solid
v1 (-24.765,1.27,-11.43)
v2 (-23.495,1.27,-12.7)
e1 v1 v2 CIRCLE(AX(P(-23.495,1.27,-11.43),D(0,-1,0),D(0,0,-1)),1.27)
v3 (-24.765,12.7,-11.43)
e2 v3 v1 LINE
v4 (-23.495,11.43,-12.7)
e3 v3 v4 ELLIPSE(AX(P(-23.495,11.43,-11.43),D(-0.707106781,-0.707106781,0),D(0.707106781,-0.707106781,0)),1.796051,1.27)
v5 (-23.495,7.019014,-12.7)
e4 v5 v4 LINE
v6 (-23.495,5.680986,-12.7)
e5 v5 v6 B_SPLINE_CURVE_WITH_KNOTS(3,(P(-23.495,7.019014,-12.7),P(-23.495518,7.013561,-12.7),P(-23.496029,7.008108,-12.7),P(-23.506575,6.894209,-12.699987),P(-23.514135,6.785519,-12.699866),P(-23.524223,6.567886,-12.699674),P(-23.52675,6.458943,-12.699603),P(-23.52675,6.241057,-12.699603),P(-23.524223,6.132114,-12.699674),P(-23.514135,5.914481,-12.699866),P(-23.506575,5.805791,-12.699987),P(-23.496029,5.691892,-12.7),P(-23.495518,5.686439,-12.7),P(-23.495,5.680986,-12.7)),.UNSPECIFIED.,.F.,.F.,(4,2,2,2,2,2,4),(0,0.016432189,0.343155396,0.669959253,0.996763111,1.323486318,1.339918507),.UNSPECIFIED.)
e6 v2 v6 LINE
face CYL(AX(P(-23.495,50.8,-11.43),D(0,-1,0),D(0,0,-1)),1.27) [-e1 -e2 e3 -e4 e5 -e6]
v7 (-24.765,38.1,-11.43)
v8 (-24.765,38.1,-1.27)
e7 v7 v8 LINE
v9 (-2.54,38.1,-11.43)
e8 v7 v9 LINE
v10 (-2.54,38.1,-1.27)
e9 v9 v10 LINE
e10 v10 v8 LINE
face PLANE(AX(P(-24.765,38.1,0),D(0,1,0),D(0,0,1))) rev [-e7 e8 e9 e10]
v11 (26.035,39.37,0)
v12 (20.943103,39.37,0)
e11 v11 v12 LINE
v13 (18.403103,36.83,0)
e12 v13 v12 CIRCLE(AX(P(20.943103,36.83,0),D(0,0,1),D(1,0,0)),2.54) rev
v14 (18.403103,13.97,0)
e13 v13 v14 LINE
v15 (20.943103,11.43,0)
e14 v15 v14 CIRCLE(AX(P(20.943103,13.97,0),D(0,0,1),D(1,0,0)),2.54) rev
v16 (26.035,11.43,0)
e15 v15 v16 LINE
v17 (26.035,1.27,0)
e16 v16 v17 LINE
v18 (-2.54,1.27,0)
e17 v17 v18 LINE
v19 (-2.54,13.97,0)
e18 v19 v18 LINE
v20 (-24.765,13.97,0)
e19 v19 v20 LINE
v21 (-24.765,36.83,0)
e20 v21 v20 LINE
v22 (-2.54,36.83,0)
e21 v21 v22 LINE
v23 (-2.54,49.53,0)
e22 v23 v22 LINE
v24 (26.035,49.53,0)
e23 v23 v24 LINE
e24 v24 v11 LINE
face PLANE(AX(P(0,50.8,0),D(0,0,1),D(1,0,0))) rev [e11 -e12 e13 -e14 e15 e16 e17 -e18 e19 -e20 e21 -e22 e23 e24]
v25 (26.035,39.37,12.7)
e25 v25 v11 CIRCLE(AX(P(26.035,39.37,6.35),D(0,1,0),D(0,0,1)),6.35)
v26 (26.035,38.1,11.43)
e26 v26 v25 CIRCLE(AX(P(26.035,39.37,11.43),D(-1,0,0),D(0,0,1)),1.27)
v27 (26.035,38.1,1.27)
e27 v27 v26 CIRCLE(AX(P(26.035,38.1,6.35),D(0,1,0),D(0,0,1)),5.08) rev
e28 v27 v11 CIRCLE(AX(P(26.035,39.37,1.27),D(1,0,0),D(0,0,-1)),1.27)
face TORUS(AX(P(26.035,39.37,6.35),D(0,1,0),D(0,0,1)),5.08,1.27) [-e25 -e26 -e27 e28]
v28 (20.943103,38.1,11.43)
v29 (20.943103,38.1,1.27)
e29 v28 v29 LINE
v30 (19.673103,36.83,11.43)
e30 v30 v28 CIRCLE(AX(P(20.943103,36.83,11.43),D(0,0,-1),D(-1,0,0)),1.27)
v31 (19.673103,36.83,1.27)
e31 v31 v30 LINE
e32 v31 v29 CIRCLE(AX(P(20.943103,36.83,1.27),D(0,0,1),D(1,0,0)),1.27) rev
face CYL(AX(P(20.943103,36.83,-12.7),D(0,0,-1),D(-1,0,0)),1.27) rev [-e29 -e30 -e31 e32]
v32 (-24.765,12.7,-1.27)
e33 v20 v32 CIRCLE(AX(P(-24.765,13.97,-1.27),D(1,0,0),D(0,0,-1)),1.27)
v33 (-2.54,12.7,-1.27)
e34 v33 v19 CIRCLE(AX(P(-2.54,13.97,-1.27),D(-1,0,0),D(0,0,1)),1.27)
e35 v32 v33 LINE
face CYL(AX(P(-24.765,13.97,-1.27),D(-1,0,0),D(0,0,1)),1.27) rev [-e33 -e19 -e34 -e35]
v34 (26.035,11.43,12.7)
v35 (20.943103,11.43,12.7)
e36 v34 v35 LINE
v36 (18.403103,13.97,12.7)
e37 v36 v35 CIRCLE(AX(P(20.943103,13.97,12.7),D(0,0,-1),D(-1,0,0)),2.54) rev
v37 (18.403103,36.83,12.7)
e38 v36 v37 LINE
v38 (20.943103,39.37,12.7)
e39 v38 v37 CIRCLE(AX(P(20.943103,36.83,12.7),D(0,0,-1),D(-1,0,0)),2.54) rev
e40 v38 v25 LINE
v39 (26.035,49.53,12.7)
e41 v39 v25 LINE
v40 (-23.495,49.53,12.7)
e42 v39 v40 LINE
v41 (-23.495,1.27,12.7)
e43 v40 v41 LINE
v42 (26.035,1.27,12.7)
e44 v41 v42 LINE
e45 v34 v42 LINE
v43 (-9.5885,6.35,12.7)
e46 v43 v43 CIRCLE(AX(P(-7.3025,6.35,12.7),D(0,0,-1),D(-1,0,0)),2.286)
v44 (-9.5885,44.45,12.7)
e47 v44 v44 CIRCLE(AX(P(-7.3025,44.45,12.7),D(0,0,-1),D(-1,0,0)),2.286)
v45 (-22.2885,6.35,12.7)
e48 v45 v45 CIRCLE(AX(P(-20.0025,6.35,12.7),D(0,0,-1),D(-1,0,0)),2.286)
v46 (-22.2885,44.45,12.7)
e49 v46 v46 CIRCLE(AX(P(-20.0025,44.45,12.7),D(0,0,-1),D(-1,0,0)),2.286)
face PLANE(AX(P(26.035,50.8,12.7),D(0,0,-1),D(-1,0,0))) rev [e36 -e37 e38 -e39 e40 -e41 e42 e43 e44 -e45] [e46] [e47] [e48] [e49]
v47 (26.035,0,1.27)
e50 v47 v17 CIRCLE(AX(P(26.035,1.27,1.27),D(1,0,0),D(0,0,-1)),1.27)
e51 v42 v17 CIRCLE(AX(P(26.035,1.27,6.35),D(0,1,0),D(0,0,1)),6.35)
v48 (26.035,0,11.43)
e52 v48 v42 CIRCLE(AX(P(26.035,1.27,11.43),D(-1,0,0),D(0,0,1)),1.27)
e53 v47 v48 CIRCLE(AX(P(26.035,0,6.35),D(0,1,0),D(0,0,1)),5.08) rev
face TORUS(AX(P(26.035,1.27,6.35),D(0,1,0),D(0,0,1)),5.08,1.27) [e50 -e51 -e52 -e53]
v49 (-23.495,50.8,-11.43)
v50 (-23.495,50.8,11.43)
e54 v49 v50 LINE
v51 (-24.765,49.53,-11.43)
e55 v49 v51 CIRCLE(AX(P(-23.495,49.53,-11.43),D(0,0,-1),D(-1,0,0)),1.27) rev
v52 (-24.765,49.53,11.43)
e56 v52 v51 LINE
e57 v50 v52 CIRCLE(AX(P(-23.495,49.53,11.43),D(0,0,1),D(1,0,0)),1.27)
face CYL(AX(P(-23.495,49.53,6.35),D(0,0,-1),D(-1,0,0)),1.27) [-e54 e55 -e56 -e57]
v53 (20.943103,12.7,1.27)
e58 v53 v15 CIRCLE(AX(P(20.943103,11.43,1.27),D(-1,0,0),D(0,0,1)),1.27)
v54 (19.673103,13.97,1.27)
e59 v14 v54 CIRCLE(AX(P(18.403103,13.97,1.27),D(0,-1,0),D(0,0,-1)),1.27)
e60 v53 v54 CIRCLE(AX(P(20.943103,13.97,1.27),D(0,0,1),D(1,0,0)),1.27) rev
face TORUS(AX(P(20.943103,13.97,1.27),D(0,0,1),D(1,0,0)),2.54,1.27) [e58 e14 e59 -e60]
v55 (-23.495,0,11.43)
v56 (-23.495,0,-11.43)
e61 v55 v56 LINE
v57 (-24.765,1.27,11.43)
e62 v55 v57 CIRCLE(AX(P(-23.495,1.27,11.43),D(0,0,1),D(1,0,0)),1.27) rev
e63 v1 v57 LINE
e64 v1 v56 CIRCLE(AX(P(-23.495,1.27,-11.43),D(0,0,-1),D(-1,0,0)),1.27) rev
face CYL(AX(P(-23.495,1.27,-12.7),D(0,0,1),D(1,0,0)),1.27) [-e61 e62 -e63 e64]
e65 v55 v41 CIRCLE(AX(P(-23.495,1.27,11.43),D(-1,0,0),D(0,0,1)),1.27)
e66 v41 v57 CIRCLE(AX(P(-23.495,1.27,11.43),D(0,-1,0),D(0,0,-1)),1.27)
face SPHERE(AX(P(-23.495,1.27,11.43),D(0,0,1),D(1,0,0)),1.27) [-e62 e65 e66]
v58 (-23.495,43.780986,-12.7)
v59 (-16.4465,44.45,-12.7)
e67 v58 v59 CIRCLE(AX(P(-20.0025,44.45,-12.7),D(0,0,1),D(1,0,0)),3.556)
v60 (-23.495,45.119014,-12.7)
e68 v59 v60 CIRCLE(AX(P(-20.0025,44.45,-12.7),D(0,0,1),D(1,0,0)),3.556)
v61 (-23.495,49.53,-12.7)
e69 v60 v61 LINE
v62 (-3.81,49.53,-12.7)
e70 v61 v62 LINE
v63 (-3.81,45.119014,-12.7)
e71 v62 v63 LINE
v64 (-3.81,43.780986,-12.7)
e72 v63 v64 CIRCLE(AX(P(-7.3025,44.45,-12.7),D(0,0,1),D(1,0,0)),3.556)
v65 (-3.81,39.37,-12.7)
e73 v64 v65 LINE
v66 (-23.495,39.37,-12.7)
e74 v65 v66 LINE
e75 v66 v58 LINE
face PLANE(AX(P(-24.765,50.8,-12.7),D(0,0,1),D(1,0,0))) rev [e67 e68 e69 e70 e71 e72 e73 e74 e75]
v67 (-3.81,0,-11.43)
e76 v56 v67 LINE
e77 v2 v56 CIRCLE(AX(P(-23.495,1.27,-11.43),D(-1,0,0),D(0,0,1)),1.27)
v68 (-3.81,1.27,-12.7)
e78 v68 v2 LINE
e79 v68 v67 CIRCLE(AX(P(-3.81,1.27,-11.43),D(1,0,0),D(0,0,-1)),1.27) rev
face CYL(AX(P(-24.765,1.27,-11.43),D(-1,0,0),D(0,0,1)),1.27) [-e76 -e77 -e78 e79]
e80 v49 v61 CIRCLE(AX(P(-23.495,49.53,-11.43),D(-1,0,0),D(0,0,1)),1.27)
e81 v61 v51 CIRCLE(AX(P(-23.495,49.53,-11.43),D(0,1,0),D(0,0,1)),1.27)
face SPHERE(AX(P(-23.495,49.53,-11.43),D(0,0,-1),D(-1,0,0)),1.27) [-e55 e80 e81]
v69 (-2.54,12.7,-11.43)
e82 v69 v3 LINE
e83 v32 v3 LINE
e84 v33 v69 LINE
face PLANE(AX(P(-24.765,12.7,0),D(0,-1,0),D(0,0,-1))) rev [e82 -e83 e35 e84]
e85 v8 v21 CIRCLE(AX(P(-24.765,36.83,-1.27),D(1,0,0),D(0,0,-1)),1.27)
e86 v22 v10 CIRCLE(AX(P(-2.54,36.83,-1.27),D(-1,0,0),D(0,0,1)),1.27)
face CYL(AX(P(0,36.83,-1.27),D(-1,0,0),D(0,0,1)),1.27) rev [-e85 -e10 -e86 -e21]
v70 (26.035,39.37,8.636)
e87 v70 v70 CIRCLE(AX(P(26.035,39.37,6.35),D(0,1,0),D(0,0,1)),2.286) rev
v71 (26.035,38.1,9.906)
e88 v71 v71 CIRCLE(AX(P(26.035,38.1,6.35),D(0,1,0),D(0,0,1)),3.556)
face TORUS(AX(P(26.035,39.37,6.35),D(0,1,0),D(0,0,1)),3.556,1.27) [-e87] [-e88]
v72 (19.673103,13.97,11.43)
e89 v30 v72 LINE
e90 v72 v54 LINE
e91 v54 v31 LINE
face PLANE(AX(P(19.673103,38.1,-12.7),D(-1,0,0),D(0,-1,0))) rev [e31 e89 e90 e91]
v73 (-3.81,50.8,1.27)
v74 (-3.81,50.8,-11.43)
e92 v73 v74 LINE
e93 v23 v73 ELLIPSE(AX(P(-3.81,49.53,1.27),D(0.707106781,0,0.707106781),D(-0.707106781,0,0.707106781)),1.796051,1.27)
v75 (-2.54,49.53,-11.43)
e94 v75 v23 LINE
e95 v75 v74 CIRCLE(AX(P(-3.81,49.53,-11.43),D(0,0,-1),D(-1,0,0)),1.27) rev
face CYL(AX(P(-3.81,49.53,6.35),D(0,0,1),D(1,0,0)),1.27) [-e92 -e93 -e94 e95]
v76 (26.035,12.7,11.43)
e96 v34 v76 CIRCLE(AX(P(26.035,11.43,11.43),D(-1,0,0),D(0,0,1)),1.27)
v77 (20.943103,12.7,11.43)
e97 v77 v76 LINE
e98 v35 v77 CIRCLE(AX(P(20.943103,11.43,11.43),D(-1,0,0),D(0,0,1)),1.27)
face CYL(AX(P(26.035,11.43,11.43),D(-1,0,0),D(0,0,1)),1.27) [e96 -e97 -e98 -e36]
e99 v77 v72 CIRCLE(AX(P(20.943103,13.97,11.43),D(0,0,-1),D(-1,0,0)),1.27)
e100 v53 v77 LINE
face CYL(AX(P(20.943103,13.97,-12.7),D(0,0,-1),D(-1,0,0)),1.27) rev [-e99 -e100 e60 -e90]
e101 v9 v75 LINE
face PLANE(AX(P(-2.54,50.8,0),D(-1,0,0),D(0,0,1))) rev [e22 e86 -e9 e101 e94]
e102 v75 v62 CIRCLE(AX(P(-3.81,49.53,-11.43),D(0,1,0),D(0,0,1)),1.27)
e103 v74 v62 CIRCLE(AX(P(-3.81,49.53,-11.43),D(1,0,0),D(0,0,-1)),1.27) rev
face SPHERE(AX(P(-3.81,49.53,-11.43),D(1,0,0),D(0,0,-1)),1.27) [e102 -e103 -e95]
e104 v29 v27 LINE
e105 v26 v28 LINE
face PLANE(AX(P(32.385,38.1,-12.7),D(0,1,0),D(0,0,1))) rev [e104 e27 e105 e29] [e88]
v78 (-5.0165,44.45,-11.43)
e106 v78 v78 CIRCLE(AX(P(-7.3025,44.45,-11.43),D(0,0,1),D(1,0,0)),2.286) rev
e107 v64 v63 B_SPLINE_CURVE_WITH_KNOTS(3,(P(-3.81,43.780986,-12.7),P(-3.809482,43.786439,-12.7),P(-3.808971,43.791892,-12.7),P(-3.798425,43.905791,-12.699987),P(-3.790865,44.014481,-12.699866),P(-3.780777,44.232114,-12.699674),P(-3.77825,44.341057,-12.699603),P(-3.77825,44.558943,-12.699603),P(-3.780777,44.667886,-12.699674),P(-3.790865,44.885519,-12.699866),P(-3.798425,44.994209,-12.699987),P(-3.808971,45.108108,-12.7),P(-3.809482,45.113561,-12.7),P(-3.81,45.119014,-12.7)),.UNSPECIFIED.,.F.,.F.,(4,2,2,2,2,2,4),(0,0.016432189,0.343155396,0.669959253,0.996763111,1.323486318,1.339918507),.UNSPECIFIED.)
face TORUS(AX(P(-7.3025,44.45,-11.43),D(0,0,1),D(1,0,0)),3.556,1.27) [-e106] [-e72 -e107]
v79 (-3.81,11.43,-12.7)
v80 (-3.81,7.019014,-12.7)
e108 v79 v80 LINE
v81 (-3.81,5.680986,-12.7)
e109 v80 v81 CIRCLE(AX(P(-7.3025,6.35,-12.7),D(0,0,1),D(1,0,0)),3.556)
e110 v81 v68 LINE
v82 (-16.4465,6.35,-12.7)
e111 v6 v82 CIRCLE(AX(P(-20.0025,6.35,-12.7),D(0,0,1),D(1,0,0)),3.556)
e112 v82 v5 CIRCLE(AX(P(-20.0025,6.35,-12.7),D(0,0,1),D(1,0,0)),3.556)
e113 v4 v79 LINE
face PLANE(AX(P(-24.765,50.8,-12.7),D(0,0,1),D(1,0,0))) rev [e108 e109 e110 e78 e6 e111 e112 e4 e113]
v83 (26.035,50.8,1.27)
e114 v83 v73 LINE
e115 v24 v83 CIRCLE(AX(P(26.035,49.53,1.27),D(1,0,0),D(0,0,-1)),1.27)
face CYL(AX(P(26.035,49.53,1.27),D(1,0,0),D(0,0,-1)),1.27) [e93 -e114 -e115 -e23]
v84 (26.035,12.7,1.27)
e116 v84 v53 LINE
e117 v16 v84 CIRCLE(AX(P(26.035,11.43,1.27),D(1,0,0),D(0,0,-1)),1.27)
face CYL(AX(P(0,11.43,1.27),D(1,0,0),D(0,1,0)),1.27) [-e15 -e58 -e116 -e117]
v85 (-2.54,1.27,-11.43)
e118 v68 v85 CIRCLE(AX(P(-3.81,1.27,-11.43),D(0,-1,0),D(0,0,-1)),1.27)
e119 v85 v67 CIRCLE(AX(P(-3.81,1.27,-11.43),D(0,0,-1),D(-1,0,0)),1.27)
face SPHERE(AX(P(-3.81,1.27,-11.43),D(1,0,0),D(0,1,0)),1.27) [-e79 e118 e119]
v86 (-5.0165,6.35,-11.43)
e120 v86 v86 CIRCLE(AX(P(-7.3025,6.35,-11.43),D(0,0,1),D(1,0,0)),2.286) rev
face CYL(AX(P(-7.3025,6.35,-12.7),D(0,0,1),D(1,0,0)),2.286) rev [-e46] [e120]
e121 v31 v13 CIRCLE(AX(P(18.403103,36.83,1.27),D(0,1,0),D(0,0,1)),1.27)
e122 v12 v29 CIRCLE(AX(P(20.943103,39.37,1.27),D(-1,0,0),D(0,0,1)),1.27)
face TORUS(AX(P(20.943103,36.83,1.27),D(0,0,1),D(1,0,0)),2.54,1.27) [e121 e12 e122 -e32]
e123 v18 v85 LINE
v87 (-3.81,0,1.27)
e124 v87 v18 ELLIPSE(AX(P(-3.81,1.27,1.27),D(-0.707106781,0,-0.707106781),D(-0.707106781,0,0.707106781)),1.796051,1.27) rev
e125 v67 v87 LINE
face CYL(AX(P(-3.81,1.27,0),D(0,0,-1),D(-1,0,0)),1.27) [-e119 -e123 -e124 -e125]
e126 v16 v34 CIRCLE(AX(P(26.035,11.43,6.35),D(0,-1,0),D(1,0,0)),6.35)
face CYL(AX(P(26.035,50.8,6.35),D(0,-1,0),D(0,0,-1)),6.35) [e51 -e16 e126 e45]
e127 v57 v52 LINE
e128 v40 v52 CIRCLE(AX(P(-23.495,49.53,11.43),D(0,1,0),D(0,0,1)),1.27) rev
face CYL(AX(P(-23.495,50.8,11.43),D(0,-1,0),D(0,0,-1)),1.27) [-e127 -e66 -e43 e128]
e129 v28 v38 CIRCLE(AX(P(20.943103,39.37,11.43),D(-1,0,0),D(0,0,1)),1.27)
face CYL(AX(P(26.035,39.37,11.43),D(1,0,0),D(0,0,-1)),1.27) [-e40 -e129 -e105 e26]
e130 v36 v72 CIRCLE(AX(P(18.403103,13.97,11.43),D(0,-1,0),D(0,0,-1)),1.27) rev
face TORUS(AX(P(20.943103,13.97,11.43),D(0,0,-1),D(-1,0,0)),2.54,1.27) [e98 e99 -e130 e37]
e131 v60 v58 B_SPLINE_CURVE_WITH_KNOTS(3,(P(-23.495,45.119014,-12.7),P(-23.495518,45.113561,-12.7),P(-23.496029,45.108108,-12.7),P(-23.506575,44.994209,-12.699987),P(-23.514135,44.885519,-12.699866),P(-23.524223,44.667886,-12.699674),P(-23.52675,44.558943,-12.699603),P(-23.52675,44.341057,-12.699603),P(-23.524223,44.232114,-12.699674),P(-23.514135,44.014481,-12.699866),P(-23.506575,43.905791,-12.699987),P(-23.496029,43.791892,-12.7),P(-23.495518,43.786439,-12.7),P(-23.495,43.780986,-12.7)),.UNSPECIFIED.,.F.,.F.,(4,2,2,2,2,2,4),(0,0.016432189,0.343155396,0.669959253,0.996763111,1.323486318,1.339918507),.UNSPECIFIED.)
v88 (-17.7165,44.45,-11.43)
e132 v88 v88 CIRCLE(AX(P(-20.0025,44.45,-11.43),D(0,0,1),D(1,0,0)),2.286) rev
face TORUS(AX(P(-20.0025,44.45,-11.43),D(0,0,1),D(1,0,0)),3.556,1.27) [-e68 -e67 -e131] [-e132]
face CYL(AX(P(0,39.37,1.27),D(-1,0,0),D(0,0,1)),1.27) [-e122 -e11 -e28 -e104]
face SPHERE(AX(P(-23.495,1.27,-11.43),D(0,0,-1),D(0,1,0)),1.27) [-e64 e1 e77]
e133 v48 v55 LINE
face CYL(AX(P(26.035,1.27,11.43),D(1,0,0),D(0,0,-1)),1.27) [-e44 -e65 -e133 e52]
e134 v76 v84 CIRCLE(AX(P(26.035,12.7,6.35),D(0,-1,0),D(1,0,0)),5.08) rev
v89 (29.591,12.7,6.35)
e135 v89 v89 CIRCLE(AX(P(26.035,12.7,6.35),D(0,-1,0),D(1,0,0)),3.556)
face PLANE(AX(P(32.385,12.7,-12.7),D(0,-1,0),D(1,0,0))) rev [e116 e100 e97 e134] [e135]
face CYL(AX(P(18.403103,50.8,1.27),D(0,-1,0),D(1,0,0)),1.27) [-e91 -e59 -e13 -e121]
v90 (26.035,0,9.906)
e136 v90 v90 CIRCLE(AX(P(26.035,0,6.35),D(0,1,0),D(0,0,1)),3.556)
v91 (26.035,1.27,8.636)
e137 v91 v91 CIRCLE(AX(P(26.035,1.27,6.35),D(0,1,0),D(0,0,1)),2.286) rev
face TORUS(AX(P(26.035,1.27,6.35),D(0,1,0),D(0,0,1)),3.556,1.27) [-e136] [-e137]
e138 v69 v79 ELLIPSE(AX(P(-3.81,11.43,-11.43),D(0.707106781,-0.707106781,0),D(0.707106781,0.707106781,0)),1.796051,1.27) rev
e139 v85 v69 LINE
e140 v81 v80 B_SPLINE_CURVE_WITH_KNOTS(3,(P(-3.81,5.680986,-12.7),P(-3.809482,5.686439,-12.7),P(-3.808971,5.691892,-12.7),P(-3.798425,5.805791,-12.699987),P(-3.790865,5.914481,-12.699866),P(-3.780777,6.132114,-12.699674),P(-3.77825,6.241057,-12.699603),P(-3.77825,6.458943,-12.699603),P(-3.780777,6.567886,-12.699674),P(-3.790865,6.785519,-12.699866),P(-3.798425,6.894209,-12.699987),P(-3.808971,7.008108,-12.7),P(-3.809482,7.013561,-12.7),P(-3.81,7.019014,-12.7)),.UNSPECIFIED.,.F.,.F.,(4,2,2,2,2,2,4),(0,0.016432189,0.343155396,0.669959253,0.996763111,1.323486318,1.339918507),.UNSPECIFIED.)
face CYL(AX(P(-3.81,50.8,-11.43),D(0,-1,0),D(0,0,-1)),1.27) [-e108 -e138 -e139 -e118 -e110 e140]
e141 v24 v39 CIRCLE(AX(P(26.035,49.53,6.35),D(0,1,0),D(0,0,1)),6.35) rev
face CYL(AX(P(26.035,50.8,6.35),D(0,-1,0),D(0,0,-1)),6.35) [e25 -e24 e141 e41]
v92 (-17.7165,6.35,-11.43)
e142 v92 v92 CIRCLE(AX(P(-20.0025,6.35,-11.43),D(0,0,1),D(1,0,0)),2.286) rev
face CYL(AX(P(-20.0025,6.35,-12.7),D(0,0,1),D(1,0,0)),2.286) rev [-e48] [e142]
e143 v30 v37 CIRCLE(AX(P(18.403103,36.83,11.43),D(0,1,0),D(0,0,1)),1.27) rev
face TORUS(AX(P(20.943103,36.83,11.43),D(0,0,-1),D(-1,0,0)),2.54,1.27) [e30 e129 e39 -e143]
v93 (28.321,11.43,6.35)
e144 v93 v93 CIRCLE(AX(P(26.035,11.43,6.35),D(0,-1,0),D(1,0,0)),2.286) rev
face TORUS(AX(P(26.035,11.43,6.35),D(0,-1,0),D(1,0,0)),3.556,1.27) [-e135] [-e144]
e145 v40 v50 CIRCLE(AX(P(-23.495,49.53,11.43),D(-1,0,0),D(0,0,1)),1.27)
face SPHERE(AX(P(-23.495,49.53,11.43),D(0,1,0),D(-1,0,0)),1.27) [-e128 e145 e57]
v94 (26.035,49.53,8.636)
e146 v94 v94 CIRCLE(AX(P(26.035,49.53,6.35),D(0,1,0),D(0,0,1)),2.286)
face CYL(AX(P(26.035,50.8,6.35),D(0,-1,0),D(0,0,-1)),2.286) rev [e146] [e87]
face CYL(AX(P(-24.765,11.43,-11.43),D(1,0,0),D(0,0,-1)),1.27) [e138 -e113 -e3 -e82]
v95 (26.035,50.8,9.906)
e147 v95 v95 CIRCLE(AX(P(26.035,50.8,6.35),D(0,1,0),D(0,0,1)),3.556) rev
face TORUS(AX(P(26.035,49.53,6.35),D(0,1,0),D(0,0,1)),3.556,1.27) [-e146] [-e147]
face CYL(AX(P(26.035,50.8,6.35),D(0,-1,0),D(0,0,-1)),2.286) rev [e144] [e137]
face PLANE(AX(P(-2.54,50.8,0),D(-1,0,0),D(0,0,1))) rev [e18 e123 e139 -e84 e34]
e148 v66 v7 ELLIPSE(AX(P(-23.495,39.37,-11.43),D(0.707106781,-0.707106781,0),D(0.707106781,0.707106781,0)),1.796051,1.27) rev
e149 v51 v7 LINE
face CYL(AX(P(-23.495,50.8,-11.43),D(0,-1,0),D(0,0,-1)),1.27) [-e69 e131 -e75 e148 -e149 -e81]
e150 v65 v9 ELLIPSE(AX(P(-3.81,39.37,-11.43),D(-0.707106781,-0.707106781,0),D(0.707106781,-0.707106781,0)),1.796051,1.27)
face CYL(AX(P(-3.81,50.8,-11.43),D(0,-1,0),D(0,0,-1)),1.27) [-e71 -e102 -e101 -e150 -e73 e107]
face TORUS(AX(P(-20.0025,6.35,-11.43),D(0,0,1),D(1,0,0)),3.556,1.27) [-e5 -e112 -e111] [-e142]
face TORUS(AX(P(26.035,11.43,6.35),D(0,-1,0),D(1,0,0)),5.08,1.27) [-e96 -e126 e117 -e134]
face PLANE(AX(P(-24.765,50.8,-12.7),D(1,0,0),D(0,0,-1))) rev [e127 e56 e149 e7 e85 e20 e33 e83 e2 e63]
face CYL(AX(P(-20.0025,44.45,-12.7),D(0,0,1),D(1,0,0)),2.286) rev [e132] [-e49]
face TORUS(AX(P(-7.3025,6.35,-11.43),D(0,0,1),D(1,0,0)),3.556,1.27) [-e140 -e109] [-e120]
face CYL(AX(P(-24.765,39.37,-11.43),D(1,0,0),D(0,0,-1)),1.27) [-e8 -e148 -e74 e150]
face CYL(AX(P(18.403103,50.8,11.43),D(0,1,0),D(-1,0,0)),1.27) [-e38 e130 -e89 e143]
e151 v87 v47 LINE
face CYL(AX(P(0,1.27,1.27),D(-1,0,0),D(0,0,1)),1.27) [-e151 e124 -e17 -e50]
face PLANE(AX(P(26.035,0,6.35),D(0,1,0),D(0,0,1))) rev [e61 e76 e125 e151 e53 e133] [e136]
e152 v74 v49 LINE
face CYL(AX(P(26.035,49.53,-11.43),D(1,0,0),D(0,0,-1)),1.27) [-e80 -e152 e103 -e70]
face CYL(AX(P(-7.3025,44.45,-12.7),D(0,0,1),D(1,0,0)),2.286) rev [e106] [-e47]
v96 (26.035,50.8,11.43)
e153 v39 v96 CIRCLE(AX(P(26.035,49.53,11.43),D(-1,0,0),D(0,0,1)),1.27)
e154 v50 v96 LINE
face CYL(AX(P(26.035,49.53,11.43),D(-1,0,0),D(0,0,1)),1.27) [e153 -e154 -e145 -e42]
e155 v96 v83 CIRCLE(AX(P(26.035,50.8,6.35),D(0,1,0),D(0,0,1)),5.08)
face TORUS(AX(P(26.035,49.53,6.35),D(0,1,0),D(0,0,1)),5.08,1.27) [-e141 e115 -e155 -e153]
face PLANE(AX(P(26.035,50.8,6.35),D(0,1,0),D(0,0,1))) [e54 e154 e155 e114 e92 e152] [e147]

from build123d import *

# Parameters (mm, degrees)
SKETCH1_R               = 2.286
BOSS_EXTRUDE1_DEPTH     = 50.8
CUT_EXTRUDE1_DEPTH      = 66.380335155
CUT_EXTRUDE1_DEPTH_BACK = 66.380335155
SKETCH2_R               = 2.286
SKETCH2_W               = 12.711897402
SKETCH2_H               = 25.4
SKETCH3_W               = 12.7
SKETCH3_H               = 25.4
CUT_EXTRUDE2_DEPTH      = 63.941922635
FILLET1_R               = 1.27


with BuildPart() as part:
    # Sketch1 → Boss-Extrude1 (new body)
    with BuildSketch(Plane(origin=(0, 0, 0), x_dir=(1, 0, 0), z_dir=(0, 1, 0))):
        with BuildLine():
            Line((0, 0), (26.035, 0))
            ThreePointArc((26.035, 0), (32.385, -6.35), (26.035, -12.7))
            Line((26.035, -12.7), (-24.765, -12.7))
            Line((-24.765, -12.7), (-24.765, 12.7))
            Line((-24.765, 12.7), (-2.54, 12.7))
            Line((-2.54, 12.7), (-2.54, 0))
            Line((-2.54, 0), (0, 0))
        make_face()
        with Locations(Location((26.035, -6.35, 0), (0, 0, 270))):
            Circle(SKETCH1_R, mode=Mode.SUBTRACT)
    extrude(amount=BOSS_EXTRUDE1_DEPTH)

    # Sketch2 → Cut-Extrude1 (cut, two sides: drawn at the far end of the back side and taken through both)
    with BuildSketch(Plane.XY.offset(12.7).offset(-CUT_EXTRUDE1_DEPTH_BACK)):
        with Locations((-20.0025, 6.35)):
            Circle(SKETCH2_R)
        with Locations((-7.3025, 6.35)):
            Circle(SKETCH2_R)
        with Locations((-7.3025, 44.45)):
            Circle(SKETCH2_R)
        with Locations((-20.0025, 44.45)):
            Circle(SKETCH2_R)
        with Locations((26.029051299, 25.4)):
            Rectangle(SKETCH2_W, SKETCH2_H)
    extrude(amount=CUT_EXTRUDE1_DEPTH + CUT_EXTRUDE1_DEPTH_BACK, mode=Mode.SUBTRACT)

    # Sketch3 → Cut-Extrude2 (cut, through all)
    with BuildSketch(Plane(origin=(-2.54, 0, 0), x_dir=(0, 0, -1), z_dir=(1, 0, 0))):
        with Locations((6.35, 25.4)):
            Rectangle(SKETCH3_W, SKETCH3_H)
    extrude(amount=-CUT_EXTRUDE2_DEPTH, mode=Mode.SUBTRACT)

    # Fillet1
    # the kernel refuses this fillet: 1.27 mm, written as the material it adds along each edge
    with BuildSketch(Plane(origin=(19.673102598, 12.7, 0), x_dir=(0, 1, 0), z_dir=(0, 0, 1)), Plane(origin=(19.673102598, 38.1, 0), x_dir=(1, 0, 0), z_dir=(0, 0, 1))) as fillet1_piece_1:
        with BuildLine():
            CenterArc((FILLET1_R, -FILLET1_R), FILLET1_R, 90, 90)
            Line((0, -FILLET1_R), (0, 0))
            Line((0, 0), (FILLET1_R, 0))
        make_face()
    extrude(amount=12.7)
    with BuildSketch(Plane(origin=(-2.54, 12.7, 0), x_dir=(0, 0, -1), z_dir=(-1, 0, 0)), Plane(origin=(-2.54, 38.1, 0), x_dir=(0, -1, 0), z_dir=(-1, 0, 0))) as fillet1_piece_2:
        with BuildLine():
            CenterArc((FILLET1_R, -FILLET1_R), FILLET1_R, 90, 90)
            Line((0, -FILLET1_R), (0, 0))
            Line((0, 0), (FILLET1_R, 0))
        make_face()
    extrude(amount=22.225)
    # the kernel refuses this fillet: 1.27 mm, written as the material it takes off along each edge
    with BuildSketch(Plane(origin=(-23.495, 49.53, -11.43), x_dir=(0, 0, -1), z_dir=(-1, 0, 0))) as fillet1_2_piece_1_section:
        Polygon((0, 0), (FILLET1_R, 0), (FILLET1_R, -FILLET1_R), (0, -FILLET1_R), align=None)
    fillet1_2_piece_1 = extrude(amount=FILLET1_R, mode=Mode.PRIVATE)
    fillet1_2_piece_1 = fillet1_2_piece_1 - Plane(origin=(-23.495, 49.53, -11.43), x_dir=(0, -0.7071067811865475, 0.7071067811865475), z_dir=(-1, 0, 0)) * Sphere(FILLET1_R, mode=Mode.PRIVATE)
    add(fillet1_2_piece_1, mode=Mode.SUBTRACT)
    with BuildSketch(Plane(origin=(-3.81, 49.53, -11.43), x_dir=(0, 0, -1), z_dir=(1, 0, 0))) as fillet1_2_piece_2_section:
        Polygon((0, 0), (FILLET1_R, 0), (FILLET1_R, FILLET1_R), (0, FILLET1_R), align=None)
    fillet1_2_piece_2 = extrude(amount=FILLET1_R, mode=Mode.PRIVATE)
    fillet1_2_piece_2 = fillet1_2_piece_2 - Plane(origin=(-3.81, 49.53, -11.43), x_dir=(0, -0.7071067811865475, 0.7071067811865475), z_dir=(1, 0, 0)) * Sphere(FILLET1_R, mode=Mode.PRIVATE)
    add(fillet1_2_piece_2, mode=Mode.SUBTRACT)
    with BuildSketch(Plane(origin=(-23.495, 1.27, 11.43), x_dir=(0, 0, 1), z_dir=(-1, 0, 0))) as fillet1_2_piece_3_section:
        Polygon((0, 0), (FILLET1_R, 0), (FILLET1_R, -FILLET1_R), (0, -FILLET1_R), align=None)
    fillet1_2_piece_3 = extrude(amount=FILLET1_R, mode=Mode.PRIVATE)
    fillet1_2_piece_3 = fillet1_2_piece_3 - Plane(origin=(-23.495, 1.27, 11.43), x_dir=(0, 0.7071067811865475, -0.7071067811865475), z_dir=(-1, 0, 0)) * Sphere(FILLET1_R, mode=Mode.PRIVATE)
    add(fillet1_2_piece_3, mode=Mode.SUBTRACT)
    with BuildSketch(Plane(origin=(-23.495, 49.53, 11.43), x_dir=(0, 0, 1), z_dir=(-1, 0, 0))) as fillet1_2_piece_4_section:
        Polygon((0, 0), (FILLET1_R, 0), (FILLET1_R, FILLET1_R), (0, FILLET1_R), align=None)
    fillet1_2_piece_4 = extrude(amount=FILLET1_R, mode=Mode.PRIVATE)
    fillet1_2_piece_4 = fillet1_2_piece_4 - Plane(origin=(-23.495, 49.53, 11.43), x_dir=(0, -0.7071067811865475, -0.7071067811865475), z_dir=(-1, 0, 0)) * Sphere(FILLET1_R, mode=Mode.PRIVATE)
    add(fillet1_2_piece_4, mode=Mode.SUBTRACT)
    with BuildSketch(Plane(origin=(-23.495, 1.27, -11.43), x_dir=(0, 0, -1), z_dir=(-1, 0, 0))) as fillet1_2_piece_5_section:
        Polygon((0, 0), (FILLET1_R, 0), (FILLET1_R, FILLET1_R), (0, FILLET1_R), align=None)
    fillet1_2_piece_5 = extrude(amount=FILLET1_R, mode=Mode.PRIVATE)
    fillet1_2_piece_5 = fillet1_2_piece_5 - Plane(origin=(-23.495, 1.27, -11.43), x_dir=(0, 0.7071067811865475, 0.7071067811865475), z_dir=(-1, 0, 0)) * Sphere(FILLET1_R, mode=Mode.PRIVATE)
    add(fillet1_2_piece_5, mode=Mode.SUBTRACT)
    with BuildSketch(Plane(origin=(-3.81, 1.27, -11.43), x_dir=(1, 0, 0), z_dir=(0, 0, -1))) as fillet1_2_piece_6_section:
        Polygon((0, 0), (FILLET1_R, 0), (FILLET1_R, FILLET1_R), (0, FILLET1_R), align=None)
    fillet1_2_piece_6 = extrude(amount=FILLET1_R, mode=Mode.PRIVATE)
    fillet1_2_piece_6 = fillet1_2_piece_6 - Plane(origin=(-3.81, 1.27, -11.43), x_dir=(-0.7071067811865475, 0.7071067811865475, 0), z_dir=(0, 0, -1)) * Sphere(FILLET1_R, mode=Mode.PRIVATE)
    add(fillet1_2_piece_6, mode=Mode.SUBTRACT)
    with BuildSketch(Plane(origin=(-23.495, 50.8, -12.7), x_dir=(0, -1, 0), z_dir=(1, 0, 0))) as fillet1_2_piece_7:
        with BuildLine():
            CenterArc((FILLET1_R, -FILLET1_R), FILLET1_R, 90, 90)
            Line((0, -FILLET1_R), (0, 0))
            Line((0, 0), (FILLET1_R, 0))
        make_face()
    extrude(amount=19.685, mode=Mode.SUBTRACT)
    with BuildSketch(Plane(origin=(-24.765, 1.27, 12.7), x_dir=(0, 0, -1), z_dir=(0, 1, 0))) as fillet1_2_piece_8:
        with BuildLine():
            CenterArc((FILLET1_R, -FILLET1_R), FILLET1_R, 90, 90)
            Line((0, -FILLET1_R), (0, 0))
            Line((0, 0), (FILLET1_R, 0))
        make_face()
    extrude(amount=48.26, mode=Mode.SUBTRACT)
    with BuildSketch(Plane(origin=(-24.765, 34.925, -12.7), x_dir=(0, 0, 1), z_dir=(0, 1, 0)), Plane(origin=(-24.765, 1.27, -12.7), x_dir=(0, 0, 1), z_dir=(0, 1, 0)), Plane(origin=(-2.54, 1.27, -12.7), x_dir=(-1, 0, 0), z_dir=(0, 1, 0))) as fillet1_2_piece_9:
        with BuildLine():
            CenterArc((FILLET1_R, FILLET1_R), FILLET1_R, 180, 90)
            Line((0, FILLET1_R), (0, 0))
            Line((0, 0), (FILLET1_R, 0))
        make_face()
    extrude(amount=14.605, mode=Mode.SUBTRACT)
    with BuildSketch(Plane(origin=(-2.54, 34.925, -12.7), x_dir=(0, 0, 1), z_dir=(0, 1, 0))) as fillet1_2_piece_10:
        with BuildLine():
            CenterArc((FILLET1_R, -FILLET1_R), FILLET1_R, 90, 90)
            Line((0, -FILLET1_R), (0, 0))
            Line((0, 0), (FILLET1_R, 0))
        make_face()
    extrude(amount=14.605, mode=Mode.SUBTRACT)
    with BuildSketch(Plane(origin=(-24.765, 50.8, 11.43), x_dir=(0, -1, 0), z_dir=(0, 0, -1))) as fillet1_2_piece_11:
        with BuildLine():
            CenterArc((FILLET1_R, -FILLET1_R), FILLET1_R, 90, 90)
            Line((0, -FILLET1_R), (0, 0))
            Line((0, 0), (FILLET1_R, 0))
        make_face()
    extrude(amount=22.86, mode=Mode.SUBTRACT)
    with BuildSketch(Plane(origin=(26.035, 0, 6.35), x_dir=(0, 0, 1), z_dir=(-1, 0, 0))) as fillet1_2_piece_12:
        with BuildLine():
            CenterArc((2.286 + FILLET1_R, FILLET1_R), FILLET1_R, 180, 90)
            Line((2.286 + FILLET1_R, 0), (2.286, 0))
            Line((2.286, 0), (2.286, FILLET1_R))
        make_face()
    revolve(axis=Axis((26.035, 0, 6.35), (0, 1, 0)), mode=Mode.SUBTRACT)
    with BuildSketch(Plane(origin=(26.035, 50.8, 6.35), x_dir=(0, 0, 1), z_dir=(-1, 0, 0))) as fillet1_2_piece_13:
        with BuildLine():
            CenterArc((2.286 + FILLET1_R, -FILLET1_R), FILLET1_R, 90, 90)
            Line((2.286 + FILLET1_R, 0), (2.286, 0))
            Line((2.286, 0), (2.286, -FILLET1_R))
        make_face()
    revolve(axis=Axis((26.035, 50.8, 6.35), (0, 1, 0)), mode=Mode.SUBTRACT)
    with BuildSketch(Plane(origin=(26.035, 50.8, 12.7), x_dir=(0, 0, -1), z_dir=(-1, 0, 0)), Plane(origin=(26.035, 0, 12.7), x_dir=(0, 1, 0), z_dir=(-1, 0, 0))) as fillet1_2_piece_14:
        with BuildLine():
            CenterArc((FILLET1_R, FILLET1_R), FILLET1_R, 180, 90)
            Line((0, FILLET1_R), (0, 0))
            Line((0, 0), (FILLET1_R, 0))
        make_face()
    extrude(amount=49.53, mode=Mode.SUBTRACT)
    with BuildSketch(Plane(origin=(26.035, 50.8, 6.35), x_dir=(0, 0, -1), z_dir=(-1, 0, 0))) as fillet1_2_piece_15:
        with BuildLine():
            CenterArc((6.35 - FILLET1_R, FILLET1_R), FILLET1_R, 270, 90)
            Line((6.35 - FILLET1_R, 0), (6.35, 0))
            Line((6.35, 0), (6.35, FILLET1_R))
        make_face()
    revolve(axis=Axis((26.035, 50.8, 6.35), (0, -1, 0)), revolution_arc=180, mode=Mode.SUBTRACT)
    with BuildSketch(Plane(origin=(-20.0025, 44.45, -12.7), x_dir=(1, 0, 0), z_dir=(0, -1, 0))) as fillet1_2_piece_16:
        with BuildLine():
            CenterArc((2.286 + FILLET1_R, FILLET1_R), FILLET1_R, 180, 90)
            Line((2.286, FILLET1_R), (2.286, 0))
            Line((2.286, 0), (2.286 + FILLET1_R, 0))
        make_face()
    revolve(axis=Axis((-20.0025, 44.45, -12.7), (0, 0, 1)), mode=Mode.SUBTRACT)
    with BuildSketch(Plane(origin=(-7.3025, 44.45, -12.7), x_dir=(1, 0, 0), z_dir=(0, -1, 0))) as fillet1_2_piece_17:
        with BuildLine():
            CenterArc((2.286 + FILLET1_R, FILLET1_R), FILLET1_R, 180, 90)
            Line((2.286, FILLET1_R), (2.286, 0))
            Line((2.286, 0), (2.286 + FILLET1_R, 0))
        make_face()
    revolve(axis=Axis((-7.3025, 44.45, -12.7), (0, 0, 1)), mode=Mode.SUBTRACT)
    with BuildSketch(Plane(origin=(-7.3025, 6.35, -12.7), x_dir=(1, 0, 0), z_dir=(0, -1, 0))) as fillet1_2_piece_18:
        with BuildLine():
            CenterArc((2.286 + FILLET1_R, FILLET1_R), FILLET1_R, 180, 90)
            Line((2.286, FILLET1_R), (2.286, 0))
            Line((2.286, 0), (2.286 + FILLET1_R, 0))
        make_face()
    revolve(axis=Axis((-7.3025, 6.35, -12.7), (0, 0, 1)), mode=Mode.SUBTRACT)
    with BuildSketch(Plane(origin=(26.035, 12.7, 6.35), x_dir=(0, 0, 1), z_dir=(1, 0, 0))) as fillet1_2_piece_19:
        with BuildLine():
            CenterArc((2.286 + FILLET1_R, FILLET1_R), FILLET1_R, 180, 90)
            Line((2.286, FILLET1_R), (2.286, 0))
            Line((2.286, 0), (2.286 + FILLET1_R, 0))
        make_face()
    revolve(axis=Axis((26.035, 12.7, 6.35), (0, -1, 0)), mode=Mode.SUBTRACT)
    with BuildSketch(Plane(origin=(26.035, 38.1, 6.35), x_dir=(0, 0, 1), z_dir=(1, 0, 0))) as fillet1_2_piece_20:
        with BuildLine():
            CenterArc((2.286 + FILLET1_R, -FILLET1_R), FILLET1_R, 90, 90)
            Line((2.286, -FILLET1_R), (2.286, 0))
            Line((2.286, 0), (2.286 + FILLET1_R, 0))
        make_face()
    revolve(axis=Axis((26.035, 38.1, 6.35), (0, -1, 0)), mode=Mode.SUBTRACT)
    with BuildSketch(Plane(origin=(-2.54, 50.8, 0), x_dir=(0, -1, 0), z_dir=(1, 0, 0)), Plane(origin=(26.035, 0, 0), x_dir=(0, 1, 0), z_dir=(-1, 0, 0))) as fillet1_2_piece_21:
        with BuildLine():
            CenterArc((FILLET1_R, -FILLET1_R), FILLET1_R, 90, 90)
            Line((0, -FILLET1_R), (0, 0))
            Line((0, 0), (FILLET1_R, 0))
        make_face()
    extrude(amount=28.575, mode=Mode.SUBTRACT)
    with BuildSketch(Plane(origin=(-20.0025, 6.35, -12.7), x_dir=(1, 0, 0), z_dir=(0, -1, 0))) as fillet1_2_piece_22:
        with BuildLine():
            CenterArc((2.286 + FILLET1_R, FILLET1_R), FILLET1_R, 180, 90)
            Line((2.286, FILLET1_R), (2.286, 0))
            Line((2.286, 0), (2.286 + FILLET1_R, 0))
        make_face()
    revolve(axis=Axis((-20.0025, 6.35, -12.7), (0, 0, 1)), mode=Mode.SUBTRACT)
    with BuildSketch(Plane(origin=(0.635, 38.1, -12.7), x_dir=(0, 0, 1), z_dir=(-1, 0, 0)), Plane(origin=(0.635, 12.7, -12.7), x_dir=(0, -1, 0), z_dir=(-1, 0, 0))) as fillet1_2_piece_23:
        with BuildLine():
            CenterArc((FILLET1_R, FILLET1_R), FILLET1_R, 180, 90)
            Line((0, FILLET1_R), (0, 0))
            Line((0, 0), (FILLET1_R, 0))
        make_face()
    extrude(amount=28.575, mode=Mode.SUBTRACT)
    with BuildSketch(Plane(origin=(26.035, 0, 6.35), x_dir=(0, 0, -1), z_dir=(-1, 0, 0))) as fillet1_2_piece_24:
        with BuildLine():
            CenterArc((6.35 - FILLET1_R, -FILLET1_R), FILLET1_R, 0, 90)
            Line((6.35 - FILLET1_R, 0), (6.35, 0))
            Line((6.35, 0), (6.35, -FILLET1_R))
        make_face()
    revolve(axis=Axis((26.035, 0, 6.35), (0, -1, 0)), revolution_arc=180, mode=Mode.SUBTRACT)
    with BuildSketch(Plane(origin=(-24.765, 0, 11.43), x_dir=(0, 1, 0), z_dir=(0, 0, -1))) as fillet1_2_piece_25:
        with BuildLine():
            CenterArc((FILLET1_R, FILLET1_R), FILLET1_R, 180, 90)
            Line((0, FILLET1_R), (0, 0))
            Line((0, 0), (FILLET1_R, 0))
        make_face()
    extrude(amount=22.86, mode=Mode.SUBTRACT)
    with BuildSketch(Plane(origin=(-2.54, 50.8, -11.43), x_dir=(0, -1, 0), z_dir=(0, 0, 1))) as fillet1_2_piece_26:
        with BuildLine():
            CenterArc((FILLET1_R, -FILLET1_R), FILLET1_R, 90, 90)
            Line((0, -FILLET1_R), (0, 0))
            Line((0, 0), (FILLET1_R, 0))
        make_face()
    extrude(amount=11.43, mode=Mode.SUBTRACT)
    with BuildSketch(Plane(origin=(-23.495, 0, -12.7), x_dir=(0, 1, 0), z_dir=(1, 0, 0))) as fillet1_2_piece_27:
        with BuildLine():
            CenterArc((FILLET1_R, FILLET1_R), FILLET1_R, 180, 90)
            Line((0, FILLET1_R), (0, 0))
            Line((0, 0), (FILLET1_R, 0))
        make_face()
    extrude(amount=19.685, mode=Mode.SUBTRACT)
    with BuildSketch(Plane(origin=(-2.54, 0, -11.43), x_dir=(0, 1, 0), z_dir=(0, 0, 1))) as fillet1_2_piece_28:
        with BuildLine():
            CenterArc((FILLET1_R, FILLET1_R), FILLET1_R, 180, 90)
            Line((0, FILLET1_R), (0, 0))
            Line((0, 0), (FILLET1_R, 0))
        make_face()
    extrude(amount=11.43, mode=Mode.SUBTRACT)
    with BuildSketch(Plane(origin=(-5.715, 50.8, 0), x_dir=(0, -1, 0), z_dir=(1, 0, 0))) as fillet1_2_piece_29a_section:
        with BuildLine():
            CenterArc((FILLET1_R, -FILLET1_R), FILLET1_R, 90, 90)
            Line((0, -FILLET1_R), (0, 0))
            Line((0, 0), (FILLET1_R, 0))
        make_face()
    fillet1_2_piece_29a = extrude(amount=31.75, mode=Mode.PRIVATE)
    fillet1_2_piece_29a = split(fillet1_2_piece_29a, bisect_by=Plane(origin=(-2.54, 50.512478205, 0.287521795), z_dir=(-1, 0, 0)), keep=Keep.TOP, mode=Mode.PRIVATE)
    with BuildSketch(Plane(origin=(-2.54, 50.8, -11.43), x_dir=(0, -1, 0), z_dir=(0, 0, 1))) as fillet1_2_piece_29b_section:
        with BuildLine():
            CenterArc((FILLET1_R, -FILLET1_R), FILLET1_R, 90, 90)
            Line((0, -FILLET1_R), (0, 0))
            Line((0, 0), (FILLET1_R, 0))
        make_face()
    fillet1_2_piece_29b = extrude(amount=14.605, mode=Mode.PRIVATE)
    fillet1_2_piece_29b = split(fillet1_2_piece_29b, bisect_by=Plane(origin=(-2.827521795, 50.512478205, 0), z_dir=(0, 0, 1)), keep=Keep.TOP, mode=Mode.PRIVATE)
    fillet1_2_piece_29 = fillet1_2_piece_29a & fillet1_2_piece_29b
    add(fillet1_2_piece_29, mode=Mode.SUBTRACT)
    with BuildSketch(Plane(origin=(-2.54, 0, -11.43), x_dir=(0, 1, 0), z_dir=(0, 0, 1))) as fillet1_2_piece_30a_section:
        with BuildLine():
            CenterArc((FILLET1_R, FILLET1_R), FILLET1_R, 180, 90)
            Line((0, FILLET1_R), (0, 0))
            Line((0, 0), (FILLET1_R, 0))
        make_face()
    fillet1_2_piece_30a = extrude(amount=14.605, mode=Mode.PRIVATE)
    fillet1_2_piece_30a = split(fillet1_2_piece_30a, bisect_by=Plane(origin=(-2.827521795, 0.287521795, 0), z_dir=(0, 0, 1)), keep=Keep.TOP, mode=Mode.PRIVATE)
    with BuildSketch(Plane(origin=(26.035, 0, 0), x_dir=(0, 1, 0), z_dir=(-1, 0, 0))) as fillet1_2_piece_30b_section:
        with BuildLine():
            CenterArc((FILLET1_R, -FILLET1_R), FILLET1_R, 90, 90)
            Line((0, -FILLET1_R), (0, 0))
            Line((0, 0), (FILLET1_R, 0))
        make_face()
    fillet1_2_piece_30b = extrude(amount=31.75, mode=Mode.PRIVATE)
    fillet1_2_piece_30b = split(fillet1_2_piece_30b, bisect_by=Plane(origin=(-2.54, 0.287521795, 0.287521795), z_dir=(-1, 0, 0)), keep=Keep.TOP, mode=Mode.PRIVATE)
    fillet1_2_piece_30 = fillet1_2_piece_30a & fillet1_2_piece_30b
    add(fillet1_2_piece_30, mode=Mode.SUBTRACT)
    # the kernel refuses this fillet: 1.27 mm, written as the material it takes off along each edge
    with BuildSketch(Plane(origin=(19.673102598, 36.83, 0), x_dir=(0, 0, 1), z_dir=(0, -1, 0)), Plane(origin=(19.673102598, 13.97, 12.7), x_dir=(0, 0, -1), z_dir=(0, 1, 0))) as fillet1_3_piece_1:
        with BuildLine():
            CenterArc((FILLET1_R, FILLET1_R), FILLET1_R, 180, 90)
            Line((0, FILLET1_R), (0, 0))
            Line((0, 0), (FILLET1_R, 0))
        make_face()
    extrude(amount=22.86, mode=Mode.SUBTRACT)
    with BuildSketch(Plane(origin=(26.035, 12.7, 6.35), x_dir=(0, 0, 1), z_dir=(-1, 0, 0))) as fillet1_3_piece_2:
        with BuildLine():
            CenterArc((6.35 - FILLET1_R, -FILLET1_R), FILLET1_R, 360, 90)
            Line((6.35, -FILLET1_R), (6.35, 0))
            Line((6.35, 0), (6.35 - FILLET1_R, 0))
        make_face()
    revolve(axis=Axis((26.035, 12.7, 6.35), (0, 1, 0)), revolution_arc=180, mode=Mode.SUBTRACT)
    with BuildSketch(Plane(origin=(26.035, 12.7, 12.7), x_dir=(0, 0, -1), z_dir=(-1, 0, 0)), Plane(origin=(20.943102598, 12.7, 0), x_dir=(0, 0, 1), z_dir=(1, 0, 0)), Plane(origin=(20.943102598, 38.1, 12.7), x_dir=(0, 0, -1), z_dir=(1, 0, 0)), Plane(origin=(26.035, 38.1, 0), x_dir=(0, 0, 1), z_dir=(-1, 0, 0))) as fillet1_3_piece_3:
        with BuildLine():
            CenterArc((FILLET1_R, FILLET1_R), FILLET1_R, 180, 90)
            Line((0, FILLET1_R), (0, 0))
            Line((0, 0), (FILLET1_R, 0))
        make_face()
    extrude(amount=5.091897402, mode=Mode.SUBTRACT)
    with BuildSketch(Plane(origin=(26.035, 38.1, 6.35), x_dir=(0, 0, 1), z_dir=(-1, 0, 0))) as fillet1_3_piece_4:
        with BuildLine():
            CenterArc((6.35 - FILLET1_R, FILLET1_R), FILLET1_R, 270, 90)
            Line((6.35 - FILLET1_R, 0), (6.35, 0))
            Line((6.35, 0), (6.35, FILLET1_R))
        make_face()
    revolve(axis=Axis((26.035, 38.1, 6.35), (0, 1, 0)), revolution_arc=180, mode=Mode.SUBTRACT)
    with BuildSketch(Plane(origin=(20.943102598, 36.83, 0), x_dir=(0, 1, 0), z_dir=(1, 0, 0))) as fillet1_3_piece_5:
        with BuildLine():
            CenterArc((1.27 + FILLET1_R, FILLET1_R), FILLET1_R, 180, 90)
            Line((1.27 + FILLET1_R, 0), (1.27, 0))
            Line((1.27, 0), (1.27, FILLET1_R))
        make_face()
    revolve(axis=Axis((20.943102598, 36.83, 0), (0, 0, 1)), revolution_arc=90, mode=Mode.SUBTRACT)
    with BuildSketch(Plane(origin=(20.943102598, 36.83, 12.7), x_dir=(0, 1, 0), z_dir=(1, 0, 0))) as fillet1_3_piece_6:
        with BuildLine():
            CenterArc((1.27 + FILLET1_R, -FILLET1_R), FILLET1_R, 90, 90)
            Line((1.27 + FILLET1_R, 0), (1.27, 0))
            Line((1.27, 0), (1.27, -FILLET1_R))
        make_face()
    revolve(axis=Axis((20.943102598, 36.83, 12.7), (0, 0, 1)), revolution_arc=90, mode=Mode.SUBTRACT)
    with BuildSketch(Plane(origin=(20.943102598, 13.97, 0), x_dir=(-1, 0, 0), z_dir=(0, 1, 0))) as fillet1_3_piece_7:
        with BuildLine():
            CenterArc((1.27 + FILLET1_R, FILLET1_R), FILLET1_R, 180, 90)
            Line((1.27 + FILLET1_R, 0), (1.27, 0))
            Line((1.27, 0), (1.27, FILLET1_R))
        make_face()
    revolve(axis=Axis((20.943102598, 13.97, 0), (0, 0, 1)), revolution_arc=90, mode=Mode.SUBTRACT)
    with BuildSketch(Plane(origin=(20.943102598, 13.97, 12.7), x_dir=(-1, 0, 0), z_dir=(0, 1, 0))) as fillet1_3_piece_8:
        with BuildLine():
            CenterArc((1.27 + FILLET1_R, -FILLET1_R), FILLET1_R, 90, 90)
            Line((1.27 + FILLET1_R, 0), (1.27, 0))
            Line((1.27, 0), (1.27, -FILLET1_R))
        make_face()
    revolve(axis=Axis((20.943102598, 13.97, 12.7), (0, 0, 1)), revolution_arc=90, mode=Mode.SUBTRACT)


solid = part.part
